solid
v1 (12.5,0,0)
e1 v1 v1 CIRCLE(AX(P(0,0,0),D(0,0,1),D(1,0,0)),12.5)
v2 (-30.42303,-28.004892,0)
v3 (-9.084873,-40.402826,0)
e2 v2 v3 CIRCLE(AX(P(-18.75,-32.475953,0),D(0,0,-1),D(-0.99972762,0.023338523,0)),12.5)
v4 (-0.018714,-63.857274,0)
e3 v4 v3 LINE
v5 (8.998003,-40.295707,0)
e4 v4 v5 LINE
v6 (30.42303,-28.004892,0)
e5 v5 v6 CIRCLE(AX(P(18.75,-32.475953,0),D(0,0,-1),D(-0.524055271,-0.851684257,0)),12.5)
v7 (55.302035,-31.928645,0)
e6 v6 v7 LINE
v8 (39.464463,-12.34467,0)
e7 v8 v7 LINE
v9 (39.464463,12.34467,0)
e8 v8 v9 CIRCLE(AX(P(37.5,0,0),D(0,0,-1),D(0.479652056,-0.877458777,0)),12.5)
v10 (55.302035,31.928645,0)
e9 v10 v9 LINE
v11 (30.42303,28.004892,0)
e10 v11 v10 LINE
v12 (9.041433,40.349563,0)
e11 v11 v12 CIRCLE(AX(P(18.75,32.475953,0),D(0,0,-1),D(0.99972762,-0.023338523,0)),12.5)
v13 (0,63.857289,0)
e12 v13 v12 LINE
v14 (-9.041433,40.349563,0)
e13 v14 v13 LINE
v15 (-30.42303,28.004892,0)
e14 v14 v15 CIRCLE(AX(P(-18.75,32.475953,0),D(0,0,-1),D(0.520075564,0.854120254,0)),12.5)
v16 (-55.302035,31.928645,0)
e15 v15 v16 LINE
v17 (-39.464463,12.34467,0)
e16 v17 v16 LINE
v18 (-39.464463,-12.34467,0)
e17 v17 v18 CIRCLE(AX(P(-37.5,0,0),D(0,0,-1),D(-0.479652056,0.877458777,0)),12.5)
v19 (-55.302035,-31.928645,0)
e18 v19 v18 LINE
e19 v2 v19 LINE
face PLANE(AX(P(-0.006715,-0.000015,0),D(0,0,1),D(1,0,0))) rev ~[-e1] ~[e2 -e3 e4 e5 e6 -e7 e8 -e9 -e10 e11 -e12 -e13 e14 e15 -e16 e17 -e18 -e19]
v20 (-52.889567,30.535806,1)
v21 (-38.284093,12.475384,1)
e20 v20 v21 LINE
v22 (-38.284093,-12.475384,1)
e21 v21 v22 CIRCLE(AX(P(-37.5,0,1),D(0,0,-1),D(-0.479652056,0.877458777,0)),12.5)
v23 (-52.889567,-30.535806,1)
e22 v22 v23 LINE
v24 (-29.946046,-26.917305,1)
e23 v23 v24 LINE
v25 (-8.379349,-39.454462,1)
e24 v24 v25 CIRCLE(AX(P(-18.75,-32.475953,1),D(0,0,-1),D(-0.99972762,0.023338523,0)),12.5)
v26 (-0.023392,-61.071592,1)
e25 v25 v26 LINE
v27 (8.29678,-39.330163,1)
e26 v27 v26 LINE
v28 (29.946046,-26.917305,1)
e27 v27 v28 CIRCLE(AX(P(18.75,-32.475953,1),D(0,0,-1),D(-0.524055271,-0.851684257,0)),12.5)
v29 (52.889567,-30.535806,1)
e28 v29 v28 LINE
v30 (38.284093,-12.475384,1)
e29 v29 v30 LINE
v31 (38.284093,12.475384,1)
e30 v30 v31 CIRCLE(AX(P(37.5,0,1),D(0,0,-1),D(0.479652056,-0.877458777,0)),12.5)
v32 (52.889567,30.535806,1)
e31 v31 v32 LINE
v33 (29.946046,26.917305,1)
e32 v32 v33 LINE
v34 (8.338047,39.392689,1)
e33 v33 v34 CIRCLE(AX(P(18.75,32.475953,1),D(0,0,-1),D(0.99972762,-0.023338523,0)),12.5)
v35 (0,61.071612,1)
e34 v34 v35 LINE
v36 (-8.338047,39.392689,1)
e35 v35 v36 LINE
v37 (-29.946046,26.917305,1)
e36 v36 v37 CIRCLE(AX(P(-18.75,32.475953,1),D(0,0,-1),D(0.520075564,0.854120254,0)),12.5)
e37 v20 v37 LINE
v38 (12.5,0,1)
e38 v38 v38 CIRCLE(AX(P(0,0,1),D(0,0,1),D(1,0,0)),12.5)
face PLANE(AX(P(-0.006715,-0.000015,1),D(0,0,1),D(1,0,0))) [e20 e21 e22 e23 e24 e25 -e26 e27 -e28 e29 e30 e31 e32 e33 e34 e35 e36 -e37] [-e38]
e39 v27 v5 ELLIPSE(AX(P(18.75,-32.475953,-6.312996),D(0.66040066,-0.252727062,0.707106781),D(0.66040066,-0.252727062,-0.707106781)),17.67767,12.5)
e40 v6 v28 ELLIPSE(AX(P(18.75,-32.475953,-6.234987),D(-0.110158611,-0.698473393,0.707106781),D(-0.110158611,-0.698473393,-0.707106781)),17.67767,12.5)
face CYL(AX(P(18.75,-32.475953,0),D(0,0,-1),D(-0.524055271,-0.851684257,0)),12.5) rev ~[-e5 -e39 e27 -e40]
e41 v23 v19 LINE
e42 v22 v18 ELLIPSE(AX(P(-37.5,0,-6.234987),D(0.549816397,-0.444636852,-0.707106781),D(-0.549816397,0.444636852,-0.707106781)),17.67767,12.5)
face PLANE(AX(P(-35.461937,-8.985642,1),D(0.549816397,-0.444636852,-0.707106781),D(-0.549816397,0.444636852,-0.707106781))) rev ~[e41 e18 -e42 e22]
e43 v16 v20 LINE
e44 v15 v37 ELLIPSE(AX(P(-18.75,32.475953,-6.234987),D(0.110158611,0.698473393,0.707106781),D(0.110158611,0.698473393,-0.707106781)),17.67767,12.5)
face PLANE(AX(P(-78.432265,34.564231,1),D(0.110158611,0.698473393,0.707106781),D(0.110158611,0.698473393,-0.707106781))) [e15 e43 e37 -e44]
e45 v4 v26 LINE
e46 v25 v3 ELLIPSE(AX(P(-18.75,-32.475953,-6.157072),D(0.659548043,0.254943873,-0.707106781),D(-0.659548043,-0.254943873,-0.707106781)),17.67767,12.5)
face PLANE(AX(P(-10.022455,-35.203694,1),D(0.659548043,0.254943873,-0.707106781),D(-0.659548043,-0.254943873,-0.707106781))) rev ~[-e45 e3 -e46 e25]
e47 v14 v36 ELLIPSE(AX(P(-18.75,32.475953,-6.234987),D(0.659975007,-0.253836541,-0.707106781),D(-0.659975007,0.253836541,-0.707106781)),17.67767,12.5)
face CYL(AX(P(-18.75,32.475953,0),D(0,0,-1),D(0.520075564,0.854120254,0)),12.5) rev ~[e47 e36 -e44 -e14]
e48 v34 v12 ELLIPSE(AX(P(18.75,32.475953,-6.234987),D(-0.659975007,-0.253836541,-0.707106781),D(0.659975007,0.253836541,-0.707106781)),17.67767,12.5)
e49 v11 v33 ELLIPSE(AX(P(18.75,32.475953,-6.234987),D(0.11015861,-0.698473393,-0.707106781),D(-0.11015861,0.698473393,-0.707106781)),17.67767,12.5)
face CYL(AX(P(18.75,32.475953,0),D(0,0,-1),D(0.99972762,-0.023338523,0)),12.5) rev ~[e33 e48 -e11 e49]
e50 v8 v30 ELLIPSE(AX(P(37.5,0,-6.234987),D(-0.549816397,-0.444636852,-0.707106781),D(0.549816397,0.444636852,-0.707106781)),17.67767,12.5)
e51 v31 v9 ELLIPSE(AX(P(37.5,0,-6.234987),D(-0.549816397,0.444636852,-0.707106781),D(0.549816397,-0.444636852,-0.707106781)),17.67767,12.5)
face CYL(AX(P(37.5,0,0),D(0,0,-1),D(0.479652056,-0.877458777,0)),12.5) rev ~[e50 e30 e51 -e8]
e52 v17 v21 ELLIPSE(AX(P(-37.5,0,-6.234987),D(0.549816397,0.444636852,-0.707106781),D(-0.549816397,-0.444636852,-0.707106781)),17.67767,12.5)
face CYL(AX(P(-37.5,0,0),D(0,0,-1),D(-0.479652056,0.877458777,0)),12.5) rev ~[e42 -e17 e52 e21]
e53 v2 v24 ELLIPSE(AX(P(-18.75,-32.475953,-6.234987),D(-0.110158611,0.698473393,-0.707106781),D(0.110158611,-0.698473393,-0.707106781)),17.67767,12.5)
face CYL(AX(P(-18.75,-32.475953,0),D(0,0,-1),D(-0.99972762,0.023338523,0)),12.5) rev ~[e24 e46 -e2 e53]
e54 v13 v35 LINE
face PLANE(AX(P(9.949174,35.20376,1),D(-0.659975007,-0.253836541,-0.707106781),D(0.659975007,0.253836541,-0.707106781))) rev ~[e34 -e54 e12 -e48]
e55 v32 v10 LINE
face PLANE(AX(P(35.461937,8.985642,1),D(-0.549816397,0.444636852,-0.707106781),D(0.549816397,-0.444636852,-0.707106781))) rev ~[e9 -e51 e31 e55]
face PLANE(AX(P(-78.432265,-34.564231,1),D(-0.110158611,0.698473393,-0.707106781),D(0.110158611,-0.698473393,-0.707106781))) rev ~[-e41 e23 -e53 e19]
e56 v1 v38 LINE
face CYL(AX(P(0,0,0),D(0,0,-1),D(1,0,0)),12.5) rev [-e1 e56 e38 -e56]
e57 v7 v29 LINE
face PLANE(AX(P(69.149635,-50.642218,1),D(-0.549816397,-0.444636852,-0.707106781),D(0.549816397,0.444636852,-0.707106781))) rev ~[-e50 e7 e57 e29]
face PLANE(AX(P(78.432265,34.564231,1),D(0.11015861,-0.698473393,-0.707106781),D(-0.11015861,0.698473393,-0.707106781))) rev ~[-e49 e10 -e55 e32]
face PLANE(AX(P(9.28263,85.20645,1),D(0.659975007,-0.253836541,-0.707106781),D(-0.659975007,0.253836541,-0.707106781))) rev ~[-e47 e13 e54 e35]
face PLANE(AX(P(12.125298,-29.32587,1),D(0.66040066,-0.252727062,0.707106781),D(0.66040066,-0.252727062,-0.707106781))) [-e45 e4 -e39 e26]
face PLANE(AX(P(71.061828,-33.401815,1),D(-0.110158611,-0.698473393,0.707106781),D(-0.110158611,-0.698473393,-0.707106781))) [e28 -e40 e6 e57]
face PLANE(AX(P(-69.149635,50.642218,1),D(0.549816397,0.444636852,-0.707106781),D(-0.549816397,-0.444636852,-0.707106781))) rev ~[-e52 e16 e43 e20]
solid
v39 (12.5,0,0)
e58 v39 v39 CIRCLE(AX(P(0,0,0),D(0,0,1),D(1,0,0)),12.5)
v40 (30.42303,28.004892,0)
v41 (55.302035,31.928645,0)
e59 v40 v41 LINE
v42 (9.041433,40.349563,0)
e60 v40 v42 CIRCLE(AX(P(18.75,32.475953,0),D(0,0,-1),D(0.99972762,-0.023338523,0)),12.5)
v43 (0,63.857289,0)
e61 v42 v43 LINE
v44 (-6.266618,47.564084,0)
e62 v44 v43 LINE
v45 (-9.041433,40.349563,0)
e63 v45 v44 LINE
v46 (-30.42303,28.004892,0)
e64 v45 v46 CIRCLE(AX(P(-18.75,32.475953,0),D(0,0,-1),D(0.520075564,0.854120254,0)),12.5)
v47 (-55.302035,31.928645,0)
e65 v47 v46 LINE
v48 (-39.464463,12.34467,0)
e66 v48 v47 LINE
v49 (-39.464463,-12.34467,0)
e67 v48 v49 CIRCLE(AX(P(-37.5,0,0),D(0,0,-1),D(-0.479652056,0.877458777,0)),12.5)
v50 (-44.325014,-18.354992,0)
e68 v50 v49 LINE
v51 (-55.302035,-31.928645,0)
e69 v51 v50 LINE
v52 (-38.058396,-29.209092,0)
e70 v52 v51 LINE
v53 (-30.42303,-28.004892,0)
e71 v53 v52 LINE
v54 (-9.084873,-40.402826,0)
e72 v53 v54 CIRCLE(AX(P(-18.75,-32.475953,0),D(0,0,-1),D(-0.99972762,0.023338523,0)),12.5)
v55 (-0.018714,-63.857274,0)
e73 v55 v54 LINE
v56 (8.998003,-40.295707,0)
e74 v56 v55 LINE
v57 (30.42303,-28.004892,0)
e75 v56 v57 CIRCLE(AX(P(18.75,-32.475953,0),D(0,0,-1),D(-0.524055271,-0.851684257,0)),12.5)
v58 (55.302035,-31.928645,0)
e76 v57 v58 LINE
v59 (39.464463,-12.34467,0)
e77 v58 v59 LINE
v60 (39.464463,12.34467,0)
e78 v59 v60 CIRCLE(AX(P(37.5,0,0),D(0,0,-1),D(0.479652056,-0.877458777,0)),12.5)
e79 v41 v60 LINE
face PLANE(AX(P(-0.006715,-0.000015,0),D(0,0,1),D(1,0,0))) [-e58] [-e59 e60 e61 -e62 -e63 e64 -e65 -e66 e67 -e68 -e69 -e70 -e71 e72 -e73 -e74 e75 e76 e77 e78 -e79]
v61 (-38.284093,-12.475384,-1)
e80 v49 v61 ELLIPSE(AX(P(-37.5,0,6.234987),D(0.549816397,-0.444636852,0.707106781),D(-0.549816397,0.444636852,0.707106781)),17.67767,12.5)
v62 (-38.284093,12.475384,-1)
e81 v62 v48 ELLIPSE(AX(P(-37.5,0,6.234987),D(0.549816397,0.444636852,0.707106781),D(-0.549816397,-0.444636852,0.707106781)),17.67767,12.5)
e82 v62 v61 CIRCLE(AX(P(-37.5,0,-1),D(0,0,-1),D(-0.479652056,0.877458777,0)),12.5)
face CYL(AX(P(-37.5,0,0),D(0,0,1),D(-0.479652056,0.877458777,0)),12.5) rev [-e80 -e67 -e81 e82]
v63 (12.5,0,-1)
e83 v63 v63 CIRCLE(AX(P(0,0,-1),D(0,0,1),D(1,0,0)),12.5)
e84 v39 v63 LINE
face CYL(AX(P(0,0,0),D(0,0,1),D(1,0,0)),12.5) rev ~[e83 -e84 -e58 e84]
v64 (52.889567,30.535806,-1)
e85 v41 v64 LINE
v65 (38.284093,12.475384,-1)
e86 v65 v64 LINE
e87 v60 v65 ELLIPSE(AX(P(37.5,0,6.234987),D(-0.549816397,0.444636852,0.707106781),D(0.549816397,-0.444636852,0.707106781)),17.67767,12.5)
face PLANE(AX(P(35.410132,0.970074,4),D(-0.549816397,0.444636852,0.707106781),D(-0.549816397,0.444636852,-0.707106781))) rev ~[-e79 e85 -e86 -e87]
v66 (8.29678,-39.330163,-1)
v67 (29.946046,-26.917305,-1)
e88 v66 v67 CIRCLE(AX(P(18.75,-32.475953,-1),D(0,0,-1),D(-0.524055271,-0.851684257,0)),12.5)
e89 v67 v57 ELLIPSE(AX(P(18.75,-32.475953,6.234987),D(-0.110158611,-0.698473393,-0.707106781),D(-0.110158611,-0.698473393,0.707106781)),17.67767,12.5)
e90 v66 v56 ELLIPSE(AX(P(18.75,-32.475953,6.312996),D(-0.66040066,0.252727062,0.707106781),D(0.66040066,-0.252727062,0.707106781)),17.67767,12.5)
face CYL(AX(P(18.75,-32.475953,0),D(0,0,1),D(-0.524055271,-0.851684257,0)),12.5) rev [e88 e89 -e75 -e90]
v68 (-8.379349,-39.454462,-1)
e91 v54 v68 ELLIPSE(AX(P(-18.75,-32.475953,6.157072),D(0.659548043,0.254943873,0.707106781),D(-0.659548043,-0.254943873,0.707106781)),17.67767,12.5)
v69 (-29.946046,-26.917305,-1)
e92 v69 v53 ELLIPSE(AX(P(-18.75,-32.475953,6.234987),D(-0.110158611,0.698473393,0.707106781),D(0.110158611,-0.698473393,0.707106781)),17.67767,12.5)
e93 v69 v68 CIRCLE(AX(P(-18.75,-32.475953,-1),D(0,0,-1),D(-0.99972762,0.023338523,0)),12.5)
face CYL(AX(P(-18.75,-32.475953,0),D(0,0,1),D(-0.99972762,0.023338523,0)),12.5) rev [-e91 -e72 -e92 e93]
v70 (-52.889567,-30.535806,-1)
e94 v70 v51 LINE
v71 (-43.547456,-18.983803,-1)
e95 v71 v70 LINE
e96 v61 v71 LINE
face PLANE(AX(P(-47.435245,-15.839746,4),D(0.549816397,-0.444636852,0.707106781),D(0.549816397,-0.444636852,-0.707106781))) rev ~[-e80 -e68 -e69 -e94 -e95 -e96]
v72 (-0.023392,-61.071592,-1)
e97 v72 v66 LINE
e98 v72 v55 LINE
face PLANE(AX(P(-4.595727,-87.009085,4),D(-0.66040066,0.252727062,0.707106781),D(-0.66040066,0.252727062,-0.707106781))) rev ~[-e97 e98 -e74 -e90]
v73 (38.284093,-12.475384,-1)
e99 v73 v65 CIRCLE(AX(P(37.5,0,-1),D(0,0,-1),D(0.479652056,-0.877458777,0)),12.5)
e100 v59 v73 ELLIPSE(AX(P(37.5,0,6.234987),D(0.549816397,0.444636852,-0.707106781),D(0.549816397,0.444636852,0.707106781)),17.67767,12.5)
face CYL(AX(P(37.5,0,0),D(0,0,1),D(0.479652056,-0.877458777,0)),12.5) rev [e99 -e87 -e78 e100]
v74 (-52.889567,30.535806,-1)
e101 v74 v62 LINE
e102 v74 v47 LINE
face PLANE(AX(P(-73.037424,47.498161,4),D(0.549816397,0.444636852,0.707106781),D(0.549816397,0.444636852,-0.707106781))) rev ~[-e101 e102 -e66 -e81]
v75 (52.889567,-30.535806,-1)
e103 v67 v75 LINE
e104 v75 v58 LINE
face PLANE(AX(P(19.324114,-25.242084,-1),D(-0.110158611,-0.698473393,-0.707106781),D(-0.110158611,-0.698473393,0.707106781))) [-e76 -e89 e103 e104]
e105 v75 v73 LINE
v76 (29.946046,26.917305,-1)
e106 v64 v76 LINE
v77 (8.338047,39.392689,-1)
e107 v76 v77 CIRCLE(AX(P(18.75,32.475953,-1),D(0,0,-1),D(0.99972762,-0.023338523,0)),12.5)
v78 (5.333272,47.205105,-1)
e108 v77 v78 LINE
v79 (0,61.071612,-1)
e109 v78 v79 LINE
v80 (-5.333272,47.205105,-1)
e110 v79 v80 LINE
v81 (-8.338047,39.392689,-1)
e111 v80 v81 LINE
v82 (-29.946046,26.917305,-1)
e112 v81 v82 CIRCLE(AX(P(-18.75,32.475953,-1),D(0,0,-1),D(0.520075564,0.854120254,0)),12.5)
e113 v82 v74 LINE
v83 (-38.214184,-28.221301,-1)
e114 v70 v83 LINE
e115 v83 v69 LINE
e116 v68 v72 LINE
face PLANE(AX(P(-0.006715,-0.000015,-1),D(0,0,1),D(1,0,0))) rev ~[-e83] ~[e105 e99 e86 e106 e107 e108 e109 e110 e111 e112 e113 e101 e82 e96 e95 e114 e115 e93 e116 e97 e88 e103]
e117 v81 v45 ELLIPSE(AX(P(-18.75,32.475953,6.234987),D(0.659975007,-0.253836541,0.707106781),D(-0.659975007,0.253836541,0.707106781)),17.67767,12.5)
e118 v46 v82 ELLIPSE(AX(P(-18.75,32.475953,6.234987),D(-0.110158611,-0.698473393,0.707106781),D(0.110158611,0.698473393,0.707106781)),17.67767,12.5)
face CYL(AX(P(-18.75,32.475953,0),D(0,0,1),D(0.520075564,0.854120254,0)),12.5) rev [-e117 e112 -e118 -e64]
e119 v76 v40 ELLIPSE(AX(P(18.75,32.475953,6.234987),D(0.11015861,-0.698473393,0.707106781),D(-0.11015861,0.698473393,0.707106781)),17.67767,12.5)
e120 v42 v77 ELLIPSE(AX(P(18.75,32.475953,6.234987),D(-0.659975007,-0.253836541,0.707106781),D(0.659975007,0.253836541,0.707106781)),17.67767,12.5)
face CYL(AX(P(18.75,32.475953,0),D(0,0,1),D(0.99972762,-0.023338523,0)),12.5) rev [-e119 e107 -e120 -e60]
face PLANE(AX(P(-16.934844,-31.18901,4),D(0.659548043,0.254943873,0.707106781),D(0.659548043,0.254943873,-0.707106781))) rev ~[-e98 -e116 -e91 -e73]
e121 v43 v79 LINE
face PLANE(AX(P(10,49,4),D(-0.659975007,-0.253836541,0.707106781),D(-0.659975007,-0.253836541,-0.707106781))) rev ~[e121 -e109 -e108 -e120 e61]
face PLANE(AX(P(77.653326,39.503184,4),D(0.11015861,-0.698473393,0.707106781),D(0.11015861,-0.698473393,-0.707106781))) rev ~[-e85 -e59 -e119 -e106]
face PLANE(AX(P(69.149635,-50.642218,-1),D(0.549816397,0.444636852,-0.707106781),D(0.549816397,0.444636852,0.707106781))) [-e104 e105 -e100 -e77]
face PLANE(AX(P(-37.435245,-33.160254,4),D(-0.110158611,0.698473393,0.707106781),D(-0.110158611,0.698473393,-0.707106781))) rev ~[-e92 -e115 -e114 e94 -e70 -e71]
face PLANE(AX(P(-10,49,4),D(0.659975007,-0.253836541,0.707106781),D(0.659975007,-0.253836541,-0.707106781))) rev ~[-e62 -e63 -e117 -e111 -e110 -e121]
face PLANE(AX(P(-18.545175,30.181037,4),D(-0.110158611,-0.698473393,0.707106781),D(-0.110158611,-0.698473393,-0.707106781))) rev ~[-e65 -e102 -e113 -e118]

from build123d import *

# Parameters (mm, degrees)
F0_R         = 12.5
F1_DEPTH     = 1
F2_T1_DEPTH  = 53.573606434
F2_T3_DEPTH  = 53.573606434
F2_T5_DEPTH  = 53.5736064345
F2_T7_DEPTH  = 53.5736064338
F2_T9_DEPTH  = 53.573606434
F2_T11_DEPTH = 59.849360607
F2_T13_DEPTH = 53.5916397473
F2_T15_DEPTH = 53.5736064341
F2_T17_DEPTH = 53.573606434
F2_T19_DEPTH = 53.573606434
F2_T21_DEPTH = 59.8387499617
F3_DEPTH     = 1
F4_T1_DEPTH  = 40.7151914942
F4_T3_DEPTH  = 19.123558468
F4_T5_DEPTH  = 40.7151914942
F4_T7_DEPTH  = 19.1235584677
F4_T9_DEPTH  = 59.8387499623
F4_T11_DEPTH = 59.8387499618
F4_T13_DEPTH = 59.8387499617
F4_T15_DEPTH = 59.8387499618
F4_T17_DEPTH = 40.7151914942
F4_T19_DEPTH = 19.1235584677
F4_T21_DEPTH = 40.7151914943
F4_T23_DEPTH = 19.1235584676
F4_T25_DEPTH = 59.828531224
F4_T27_DEPTH = 59.849360607
F5_T1_DEPTH  = 59.8387499611
F5_T3_DEPTH  = 59.838749962
F6_T1_DEPTH  = 52.3772114997


# Not quite as in the source:
# - a fillet or chamfer that OpenCascade refuses, or shapes differently, is made with other operations: its cross-section is extruded or revolved along the edge and cut away or added
# - a feature names something its author has since deleted; it is built from what else it names


with BuildPart() as f1:
    # F0 (on Top) → F1 (new body)
    with BuildSketch(Plane.XY):
        with BuildLine():
            ThreePointArc((12.1993091148, -43.1220058508), (12.5252728209, -21.6360831063), (31.2465952446, -32.1842211044))
            Line((31.2465952446, -32.1842211044), (37.4352447857, -33.1602540379))
            Line((37.4352447857, -33.1602540379), (64.9519052827, -37.5000000012))
            Line((64.9519052827, -37.5000000012), (47.4352447858, -15.8397459622))
            Line((47.4352447858, -15.8397459622), (47.4101819713, -15.8831560303))
            ThreePointArc((47.4101819713, -15.8831560303), (47.4189900332, -15.8568402989), (47.4277834882, -15.830519683))
            Line((47.4277834882, -15.830519683), (43.4956507006, -10.968234711))
            ThreePointArc((43.4956507006, -10.968234711), (25, -3e-10), (43.4956507, 10.9682347114))
            Line((43.4956507, 10.9682347114), (47.4277834882, 15.8305196828))
            ThreePointArc((47.4277834882, 15.8305196828), (47.4189900332, 15.8568402987), (47.4101819713, 15.8831560301))
            Line((47.4101819713, 15.8831560301), (47.4352447858, 15.8397459621))
            Line((47.4352447858, 15.8397459621), (64.9519052853, 37.4999999987))
            Line((64.9519052853, 37.4999999987), (37.4352447862, 33.1602540379))
            Line((37.4352447862, 33.1602540379), (37.4603076002, 33.1168439697))
            ThreePointArc((37.4603076002, 33.1168439697), (37.4419215393, 33.1376298408), (37.4235239447, 33.1584055041))
            Line((37.4235239447, 33.1584055041), (31.2465952455, 32.1842211051))
            ThreePointArc((31.2465952455, 32.1842211051), (12.500000001, 21.6506350947), (12.2490554557, 43.152455816))
            Line((12.2490554557, 43.152455816), (10.0042595438, 48.988925187))
            ThreePointArc((10.0042595437, 48.988925187), (9.9770684942, 48.9944701396), (9.9498743714, 49))
            Line((9.9498743714, 49), (10.0000000003, 49))
            Line((10.0000000003, 49), (3e-10, 75))
            Line((3e-10, 75), (-9.9999999997, 49))
            Line((-9.9999999997, 49), (-9.9498743707, 49))
            ThreePointArc((-9.9498743707, 49), (-9.9770684936, 48.9944701396), (-10.0042595431, 48.988925187))
            Line((-10.0042595431, 48.988925187), (-12.2490554551, 43.1524558158))
            ThreePointArc((-12.2490554551, 43.1524558158), (-12.4999999997, 21.6506350948), (-31.2465952441, 32.1842211045))
            Line((-31.2465952441, 32.1842211045), (-37.4352447851, 33.1602540377))
            Line((-37.4352447851, 33.1602540377), (-64.951905283, 37.5000000002))
            Line((-64.951905283, 37.5000000002), (-47.4352447851, 15.839745962))
            Line((-47.4352447851, 15.839745962), (-47.4101819706, 15.8831560301))
            ThreePointArc((-47.4101819706, 15.8831560301), (-47.4189900325, 15.8568402987), (-47.4277834875, 15.8305196828))
            Line((-47.4277834875, 15.8305196828), (-43.4956506999, 10.9682347111))
            ThreePointArc((-43.4956506999, 10.9682347111), (-24.9999999998, 0), (-43.4956506997, -10.9682347113))
            Line((-43.4956506997, -10.9682347113), (-47.4277834875, -15.830519683))
            ThreePointArc((-47.4277834875, -15.830519683), (-47.4189900326, -15.8568402989), (-47.4101819706, -15.8831560303))
            Line((-47.4101819706, -15.8831560303), (-47.4352447851, -15.8397459622))
            Line((-47.4352447851, -15.8397459622), (-64.9519052836, -37.5))
            Line((-64.9519052836, -37.5), (-37.4352447851, -33.1602540379))
            Line((-37.4352447851, -33.1602540379), (-37.4603075996, -33.1168439699))
            ThreePointArc((-37.4603075996, -33.1168439699), (-37.4419215386, -33.1376298409), (-37.4235239441, -33.1584055043))
            Line((-37.4235239441, -33.1584055043), (-31.2465952444, -32.1842211048))
            ThreePointArc((-31.2465952444, -32.1842211048), (-12.4748304406, -21.6652058125), (-12.2988061822, -43.1825906916))
            Line((-12.2988061822, -43.1825906916), (-10.058717508, -48.977772531))
            ThreePointArc((-10.058717508, -48.977772531), (-10.0043021126, -48.9889164938), (-9.9498743711, -49))
            Line((-9.9498743711, -49), (-10.0501256289, -49))
            Line((-10.0501256289, -49), (0, -75))
            Line((0, -75), (9.9498743711, -49))
            Line((9.9498743711, -49), (12.1993091148, -43.1220058508))
        make_face()
        Circle(F0_R, mode=Mode.SUBTRACT)
    extrude(amount=F1_DEPTH)

    # F2: chamfer of 5 on 11 edges, made by hand

    # F2_s2 → F2_t1 (cut)
    with BuildSketch(Plane(origin=(-10.5129640229, 27.3337064595, 0), x_dir=(0, 0, 1), z_dir=(-0.3589790793, 0.9333456062, 0))):
        Polygon((1, 21.9234309485), (-4, 26.9234309485), (1, 26.9234309485), align=None)
    extrude(amount=F2_T1_DEPTH, mode=Mode.SUBTRACT)

    # F2_s4 → F2_t3 (cut)
    with BuildSketch(Plane(origin=(29.7447679359, 77.3363966333, 0), x_dir=(0, 0, 1), z_dir=(-0.3589790793, -0.9333456062, 0))):
        Polygon((1, 21.9234309479), (-4, 26.9234309479), (1, 26.9234309479), align=None)
    extrude(amount=F2_T3_DEPTH, mode=Mode.SUBTRACT)

    # F2_s6 → F2_t5 (cut)
    with BuildSketch(Plane(origin=(81.84766809, 12.9084736504, 0), x_dir=(0, 0, 1), z_dir=(-0.9877905451, -0.1557878009, 0))):
        Polygon((1, 21.9234309501), (-4, 26.9234309501), (1, 26.9234309501), align=None)
    extrude(amount=F2_T5_DEPTH, mode=Mode.SUBTRACT)

    # F2_s8 → F2_t7 (cut)
    with BuildSketch(Plane(origin=(18.4152021646, 22.771347143, 0), x_dir=(0, 0, 1), z_dir=(0.6288114659, 0.7775578052, 0))):
        Polygon((1, 21.9234309459), (-4, 26.9234309459), (1, 26.9234309459), align=None)
    extrude(amount=F2_T7_DEPTH, mode=Mode.SUBTRACT)

    # F2_s10 → F2_t9 (cut)
    with BuildSketch(Plane(origin=(52.1029001483, -64.427922981, 0), x_dir=(0, 0, 1), z_dir=(-0.6288114658, 0.7775578053, 0))):
        Polygon((1, 21.9234309512), (-4, 26.9234309512), (1, 26.9234309512), align=None)
    extrude(amount=F2_T9_DEPTH, mode=Mode.SUBTRACT)

    # F2_s12 → F2_t11 (cut)
    with BuildSketch(Plane(origin=(-8.2401320813, -21.5322752955, 0), x_dir=(0, 0, 1), z_dir=(-0.3574100383, -0.9339475705, 0))):
        Polygon((1, -21.8057528732), (-4, -26.8057528732), (1, -26.8057528732), align=None)
    extrude(amount=F2_T11_DEPTH, mode=Mode.SUBTRACT)

    # F2_s14 → F2_t13 (cut)
    with BuildSketch(Plane(origin=(10.5359959788, -27.256962307, 0), x_dir=(0, 0, 1), z_dir=(0.3605450827, -0.9327417881, 0))):
        Polygon((1, 22.0408812024), (-4, 27.0408812024), (1, 27.0408812024), align=None)
    extrude(amount=F2_T13_DEPTH, mode=Mode.SUBTRACT)

    # F2_s16 → F2_t15 (cut)
    with BuildSketch(Plane(origin=(-81.8476680892, -12.9084736542, 0), x_dir=(0, 0, 1), z_dir=(0.9877905451, 0.155787801, 0))):
        Polygon((1, 21.9234309484), (-4, 26.9234309484), (1, 26.9234309484), align=None)
    extrude(amount=F2_T15_DEPTH, mode=Mode.SUBTRACT)

    # F2_s18 → F2_t17 (cut)
    with BuildSketch(Plane(origin=(-18.4152021622, -22.7713471426, 0), x_dir=(0, 0, 1), z_dir=(-0.6288114658, -0.7775578052, 0))):
        Polygon((1, 21.9234309477), (-4, 26.9234309477), (1, 26.9234309477), align=None)
    extrude(amount=F2_T17_DEPTH, mode=Mode.SUBTRACT)

    # F2_s20 → F2_t19 (cut)
    with BuildSketch(Plane(origin=(-52.1029001516, 64.4279229792, 0), x_dir=(0, 0, 1), z_dir=(0.6288114658, -0.7775578052, 0))):
        Polygon((1, 21.9234309489), (-4, 26.9234309489), (1, 26.9234309489), align=None)
    extrude(amount=F2_T19_DEPTH, mode=Mode.SUBTRACT)

    # F2_s22 → F2_t21 (cut)
    with BuildSketch(Plane(origin=(-81.8476680889, 12.9084736558, 0), x_dir=(0, 0, 1), z_dir=(0.9877905451, -0.155787801, 0))):
        Polygon((1, -21.9234309474), (-4, -26.9234309474), (1, -26.9234309474), align=None)
    extrude(amount=F2_T21_DEPTH, mode=Mode.SUBTRACT)

    # F6: chamfer of 5 on 1 edges, made by hand

    # F6_s2 → F6_t1 (cut)
    with BuildSketch(Plane(origin=(74.477230945, -11.7460569893, 0), x_dir=(0, 0, 1), z_dir=(-0.9877905451, 0.155787801, 0))):
        Polygon((1, -21.9234309461), (-4, -26.9234309461), (1, -26.9234309461), align=None)
    extrude(amount=F6_T1_DEPTH, mode=Mode.SUBTRACT)


with BuildPart() as f3:
    # F0 (on Top) → F3 (new body)
    with BuildSketch(Plane.XY):
        with BuildLine():
            ThreePointArc((12.1993091148, -43.1220058508), (12.5252728209, -21.6360831063), (31.2465952446, -32.1842211044))
            Line((31.2465952446, -32.1842211044), (37.4352447857, -33.1602540379))
            Line((37.4352447857, -33.1602540379), (64.9519052827, -37.5000000012))
            Line((64.9519052827, -37.5000000012), (47.4352447858, -15.8397459622))
            Line((47.4352447858, -15.8397459622), (47.4101819713, -15.8831560303))
            ThreePointArc((47.4101819713, -15.8831560303), (47.4189900332, -15.8568402989), (47.4277834882, -15.830519683))
            Line((47.4277834882, -15.830519683), (43.4956507006, -10.968234711))
            ThreePointArc((43.4956507006, -10.968234711), (25, -3e-10), (43.4956507, 10.9682347114))
            Line((43.4956507, 10.9682347114), (47.4277834882, 15.8305196828))
            ThreePointArc((47.4277834882, 15.8305196828), (47.4189900332, 15.8568402987), (47.4101819713, 15.8831560301))
            Line((47.4101819713, 15.8831560301), (47.4352447858, 15.8397459621))
            Line((47.4352447858, 15.8397459621), (64.9519052853, 37.4999999987))
            Line((64.9519052853, 37.4999999987), (37.4352447862, 33.1602540379))
            Line((37.4352447862, 33.1602540379), (37.4603076002, 33.1168439697))
            ThreePointArc((37.4603076002, 33.1168439697), (37.4419215393, 33.1376298408), (37.4235239447, 33.1584055041))
            Line((37.4235239447, 33.1584055041), (31.2465952455, 32.1842211051))
            ThreePointArc((31.2465952455, 32.1842211051), (12.500000001, 21.6506350947), (12.2490554557, 43.152455816))
            Line((12.2490554557, 43.152455816), (10.0042595438, 48.988925187))
            ThreePointArc((10.0042595437, 48.988925187), (9.9770684942, 48.9944701396), (9.9498743714, 49))
            Line((9.9498743714, 49), (10.0000000003, 49))
            Line((10.0000000003, 49), (3e-10, 75))
            Line((3e-10, 75), (-9.9999999997, 49))
            Line((-9.9999999997, 49), (-9.9498743707, 49))
            ThreePointArc((-9.9498743707, 49), (-9.9770684936, 48.9944701396), (-10.0042595431, 48.988925187))
            Line((-10.0042595431, 48.988925187), (-12.2490554551, 43.1524558158))
            ThreePointArc((-12.2490554551, 43.1524558158), (-12.4999999997, 21.6506350948), (-31.2465952441, 32.1842211045))
            Line((-31.2465952441, 32.1842211045), (-37.4352447851, 33.1602540377))
            Line((-37.4352447851, 33.1602540377), (-64.951905283, 37.5000000002))
            Line((-64.951905283, 37.5000000002), (-47.4352447851, 15.839745962))
            Line((-47.4352447851, 15.839745962), (-47.4101819706, 15.8831560301))
            ThreePointArc((-47.4101819706, 15.8831560301), (-47.4189900325, 15.8568402987), (-47.4277834875, 15.8305196828))
            Line((-47.4277834875, 15.8305196828), (-43.4956506999, 10.9682347111))
            ThreePointArc((-43.4956506999, 10.9682347111), (-24.9999999998, 0), (-43.4956506997, -10.9682347113))
            Line((-43.4956506997, -10.9682347113), (-47.4277834875, -15.830519683))
            ThreePointArc((-47.4277834875, -15.830519683), (-47.4189900326, -15.8568402989), (-47.4101819706, -15.8831560303))
            Line((-47.4101819706, -15.8831560303), (-47.4352447851, -15.8397459622))
            Line((-47.4352447851, -15.8397459622), (-64.9519052836, -37.5))
            Line((-64.9519052836, -37.5), (-37.4352447851, -33.1602540379))
            Line((-37.4352447851, -33.1602540379), (-37.4603075996, -33.1168439699))
            ThreePointArc((-37.4603075996, -33.1168439699), (-37.4419215386, -33.1376298409), (-37.4235239441, -33.1584055043))
            Line((-37.4235239441, -33.1584055043), (-31.2465952444, -32.1842211048))
            ThreePointArc((-31.2465952444, -32.1842211048), (-12.4748304406, -21.6652058125), (-12.2988061822, -43.1825906916))
            Line((-12.2988061822, -43.1825906916), (-10.058717508, -48.977772531))
            ThreePointArc((-10.058717508, -48.977772531), (-10.0043021126, -48.9889164938), (-9.9498743711, -49))
            Line((-9.9498743711, -49), (-10.0501256289, -49))
            Line((-10.0501256289, -49), (0, -75))
            Line((0, -75), (9.9498743711, -49))
            Line((9.9498743711, -49), (12.1993091148, -43.1220058508))
        make_face()
        Circle(F0_R, mode=Mode.SUBTRACT)
        with BuildLine():
            Line((47.4101819713, -15.8831560303), (47.4352447858, -15.8397459622))
            Line((47.4352447858, -15.8397459622), (47.4277834882, -15.830519683))
            ThreePointArc((47.4277834882, -15.830519683), (47.4189900332, -15.8568402989), (47.4101819713, -15.8831560303))
        make_face()
        with BuildLine():
            Line((-10.058717508, -48.977772531), (-10.0501256289, -49))
            Line((-10.0501256289, -49), (-9.9498743711, -49))
            ThreePointArc((-9.9498743711, -49), (-10.0043021126, -48.9889164938), (-10.058717508, -48.977772531))
        make_face()
        with BuildLine():
            ThreePointArc((47.4101819713, 15.8831560301), (47.4189900332, 15.8568402987), (47.4277834882, 15.8305196828))
            Line((47.4277834882, 15.8305196828), (47.4352447858, 15.8397459621))
            Line((47.4352447858, 15.8397459621), (47.4101819713, 15.8831560301))
        make_face()
        with BuildLine():
            Line((-37.4352447851, -33.1602540379), (-37.4235239441, -33.1584055043))
            ThreePointArc((-37.4235239441, -33.1584055043), (-37.4419215386, -33.1376298409), (-37.4603075996, -33.1168439699))
            Line((-37.4603075996, -33.1168439699), (-37.4352447851, -33.1602540379))
        make_face()
        with BuildLine():
            Line((37.4603076002, 33.1168439697), (37.4352447862, 33.1602540379))
            Line((37.4352447862, 33.1602540379), (37.4235239447, 33.1584055041))
            ThreePointArc((37.4235239447, 33.1584055041), (37.4419215393, 33.1376298408), (37.4603076002, 33.1168439697))
        make_face()
        with BuildLine():
            Line((-47.4277834875, -15.830519683), (-47.4352447851, -15.8397459622))
            Line((-47.4352447851, -15.8397459622), (-47.4101819706, -15.8831560303))
            ThreePointArc((-47.4101819706, -15.8831560303), (-47.4189900326, -15.8568402989), (-47.4277834875, -15.830519683))
        make_face()
        with BuildLine():
            ThreePointArc((9.9498743714, 49), (9.9770684942, 48.9944701396), (10.0042595437, 48.988925187))
            Line((10.0042595438, 48.988925187), (10.0000000003, 49))
            Line((10.0000000003, 49), (9.9498743714, 49))
        make_face()
        with BuildLine():
            Line((-47.4352447851, 15.839745962), (-47.4277834875, 15.8305196828))
            ThreePointArc((-47.4277834875, 15.8305196828), (-47.4189900325, 15.8568402987), (-47.4101819706, 15.8831560301))
            Line((-47.4101819706, 15.8831560301), (-47.4352447851, 15.839745962))
        make_face()
        with BuildLine():
            Line((-9.9498743707, 49), (-9.9999999997, 49))
            Line((-9.9999999997, 49), (-10.0042595431, 48.988925187))
            ThreePointArc((-10.0042595431, 48.988925187), (-9.9770684936, 48.9944701396), (-9.9498743707, 49))
        make_face()
    extrude(amount=-F3_DEPTH)

    # F4: chamfer of 5 on 14 edges, made by hand

    # F4_s2 → F4_t1 (cut)
    with BuildSketch(Plane(origin=(29.7447679359, 77.3363966333, 0), x_dir=(0, 0, 1), z_dir=(-0.3589790793, -0.9333456062, 0))):
        Polygon((4, 26.9234309479), (-1, 21.9234309479), (-1, 26.9234309479), align=None)
    extrude(amount=F4_T1_DEPTH, mode=Mode.SUBTRACT)

    # F4_s4 → F4_t3 (cut)
    with BuildSketch(Plane(origin=(15.1288659793, 39.3350515467, 0), x_dir=(0, 0, 1), z_dir=(-0.3589790793, -0.9333456062, 0))):
        Polygon((4, 26.9234309477), (-1, 21.9234309477), (-1, 26.9234309477), align=None)
    extrude(amount=F4_T3_DEPTH, mode=Mode.SUBTRACT)

    # F4_s6 → F4_t5 (cut)
    with BuildSketch(Plane(origin=(-15.1288659793, 39.3350515463, 0), x_dir=(0, 0, 1), z_dir=(-0.3589790793, 0.9333456062, 0))):
        Polygon((4, 26.9234309485), (-1, 21.9234309485), (-1, 26.9234309485), align=None)
    extrude(amount=F4_T5_DEPTH, mode=Mode.SUBTRACT)

    # F4_s8 → F4_t7 (cut)
    with BuildSketch(Plane(origin=(-8.2639085674, 21.4861622756, 0), x_dir=(0, 0, 1), z_dir=(-0.3589790793, 0.9333456062, 0))):
        Polygon((4, 26.9234309483), (-1, 21.9234309483), (-1, 26.9234309483), align=None)
    extrude(amount=F4_T7_DEPTH, mode=Mode.SUBTRACT)

    # F4_s10 → F4_t9 (cut)
    with BuildSketch(Plane(origin=(81.84766809, 12.9084736504, 0), x_dir=(0, 0, 1), z_dir=(-0.9877905451, -0.1557878009, 0))):
        Polygon((4, 26.9234309501), (-1, 21.9234309501), (-1, 26.9234309501), align=None)
    extrude(amount=F4_T9_DEPTH, mode=Mode.SUBTRACT)

    # F4_s12 → F4_t11 (cut)
    with BuildSketch(Plane(origin=(14.4756080788, 17.8998358922, 0), x_dir=(0, 0, 1), z_dir=(0.6288114659, 0.7775578052, 0))):
        Polygon((4, 26.9234309459), (-1, 21.9234309459), (-1, 26.9234309459), align=None)
    extrude(amount=F4_T11_DEPTH, mode=Mode.SUBTRACT)

    # F4_s14 → F4_t13 (cut)
    with BuildSketch(Plane(origin=(-22.7395166441, 3.5863263841, 0), x_dir=(0, 0, 1), z_dir=(-0.9877905451, 0.155787801, 0))):
        Polygon((4, 26.9234309474), (-1, 21.9234309474), (-1, 26.9234309474), align=None)
    extrude(amount=F4_T13_DEPTH, mode=Mode.SUBTRACT)

    # F4_s16 → F4_t15 (cut)
    with BuildSketch(Plane(origin=(-52.1029001516, 64.4279229792, 0), x_dir=(0, 0, 1), z_dir=(0.6288114658, -0.7775578052, 0))):
        Polygon((4, 26.9234309489), (-1, 21.9234309489), (-1, 26.9234309489), align=None)
    extrude(amount=F4_T15_DEPTH, mode=Mode.SUBTRACT)

    # F4_s18 → F4_t17 (cut)
    with BuildSketch(Plane(origin=(-26.5007209087, -32.7695080417, 0), x_dir=(0, 0, 1), z_dir=(-0.6288114658, -0.7775578052, 0))):
        Polygon((4, 26.9234309477), (-1, 21.9234309477), (-1, 26.9234309477), align=None)
    extrude(amount=F4_T17_DEPTH, mode=Mode.SUBTRACT)

    # F4_s20 → F4_t19 (cut)
    with BuildSketch(Plane(origin=(-14.4756080768, -17.8998358917, 0), x_dir=(0, 0, 1), z_dir=(-0.6288114658, -0.7775578052, 0))):
        Polygon((4, 26.9234309476), (-1, 21.9234309476), (-1, 26.9234309476), align=None)
    extrude(amount=F4_T19_DEPTH, mode=Mode.SUBTRACT)

    # F4_s22 → F4_t21 (cut)
    with BuildSketch(Plane(origin=(-81.8476680892, -12.9084736542, 0), x_dir=(0, 0, 1), z_dir=(0.9877905451, 0.155787801, 0))):
        Polygon((4, 26.9234309484), (-1, 21.9234309484), (-1, 26.9234309484), align=None)
    extrude(amount=F4_T21_DEPTH, mode=Mode.SUBTRACT)

    # F4_s24 → F4_t23 (cut)
    with BuildSketch(Plane(origin=(-41.6295868876, -6.5655435043, 0), x_dir=(0, 0, 1), z_dir=(0.9877905451, 0.155787801, 0))):
        Polygon((4, 26.9234309485), (-1, 21.9234309485), (-1, 26.9234309485), align=None)
    extrude(amount=F4_T23_DEPTH, mode=Mode.SUBTRACT)

    # F4_s26 → F4_t25 (cut)
    with BuildSketch(Plane(origin=(8.2873154255, -21.4395529986, 0), x_dir=(0, 0, 1), z_dir=(0.3605450827, -0.9327417881, 0))):
        Polygon((4, 27.0408812024), (-1, 22.0408812024), (-1, 27.0408812024), align=None)
    extrude(amount=F4_T25_DEPTH, mode=Mode.SUBTRACT)

    # F4_s28 → F4_t27 (cut)
    with BuildSketch(Plane(origin=(-29.6308943486, -77.4284402327, 0), x_dir=(0, 0, 1), z_dir=(0.3574100383, 0.9339475705, 0))):
        Polygon((4, 26.8057528732), (-1, 21.8057528732), (-1, 26.8057528732), align=None)
    extrude(amount=F4_T27_DEPTH, mode=Mode.SUBTRACT)

    # F5: chamfer of 5 on 2 edges, made by hand

    # F5_s2 → F5_t1 (cut)
    with BuildSketch(Plane(origin=(22.7395166453, -3.5863263851, 0), x_dir=(0, 0, 1), z_dir=(0.9877905451, -0.155787801, 0))):
        Polygon((-1, 21.9234309461), (4, 26.9234309461), (-1, 26.9234309461), align=None)
    extrude(amount=F5_T1_DEPTH, mode=Mode.SUBTRACT)

    # F5_s4 → F5_t3 (cut)
    with BuildSketch(Plane(origin=(52.1029001483, -64.427922981, 0), x_dir=(0, 0, 1), z_dir=(-0.6288114658, 0.7775578053, 0))):
        Polygon((-1, 21.9234309512), (4, 26.9234309512), (-1, 26.9234309512), align=None)
    extrude(amount=F5_T3_DEPTH, mode=Mode.SUBTRACT)


solid = Compound([f1.part, f3.part])
